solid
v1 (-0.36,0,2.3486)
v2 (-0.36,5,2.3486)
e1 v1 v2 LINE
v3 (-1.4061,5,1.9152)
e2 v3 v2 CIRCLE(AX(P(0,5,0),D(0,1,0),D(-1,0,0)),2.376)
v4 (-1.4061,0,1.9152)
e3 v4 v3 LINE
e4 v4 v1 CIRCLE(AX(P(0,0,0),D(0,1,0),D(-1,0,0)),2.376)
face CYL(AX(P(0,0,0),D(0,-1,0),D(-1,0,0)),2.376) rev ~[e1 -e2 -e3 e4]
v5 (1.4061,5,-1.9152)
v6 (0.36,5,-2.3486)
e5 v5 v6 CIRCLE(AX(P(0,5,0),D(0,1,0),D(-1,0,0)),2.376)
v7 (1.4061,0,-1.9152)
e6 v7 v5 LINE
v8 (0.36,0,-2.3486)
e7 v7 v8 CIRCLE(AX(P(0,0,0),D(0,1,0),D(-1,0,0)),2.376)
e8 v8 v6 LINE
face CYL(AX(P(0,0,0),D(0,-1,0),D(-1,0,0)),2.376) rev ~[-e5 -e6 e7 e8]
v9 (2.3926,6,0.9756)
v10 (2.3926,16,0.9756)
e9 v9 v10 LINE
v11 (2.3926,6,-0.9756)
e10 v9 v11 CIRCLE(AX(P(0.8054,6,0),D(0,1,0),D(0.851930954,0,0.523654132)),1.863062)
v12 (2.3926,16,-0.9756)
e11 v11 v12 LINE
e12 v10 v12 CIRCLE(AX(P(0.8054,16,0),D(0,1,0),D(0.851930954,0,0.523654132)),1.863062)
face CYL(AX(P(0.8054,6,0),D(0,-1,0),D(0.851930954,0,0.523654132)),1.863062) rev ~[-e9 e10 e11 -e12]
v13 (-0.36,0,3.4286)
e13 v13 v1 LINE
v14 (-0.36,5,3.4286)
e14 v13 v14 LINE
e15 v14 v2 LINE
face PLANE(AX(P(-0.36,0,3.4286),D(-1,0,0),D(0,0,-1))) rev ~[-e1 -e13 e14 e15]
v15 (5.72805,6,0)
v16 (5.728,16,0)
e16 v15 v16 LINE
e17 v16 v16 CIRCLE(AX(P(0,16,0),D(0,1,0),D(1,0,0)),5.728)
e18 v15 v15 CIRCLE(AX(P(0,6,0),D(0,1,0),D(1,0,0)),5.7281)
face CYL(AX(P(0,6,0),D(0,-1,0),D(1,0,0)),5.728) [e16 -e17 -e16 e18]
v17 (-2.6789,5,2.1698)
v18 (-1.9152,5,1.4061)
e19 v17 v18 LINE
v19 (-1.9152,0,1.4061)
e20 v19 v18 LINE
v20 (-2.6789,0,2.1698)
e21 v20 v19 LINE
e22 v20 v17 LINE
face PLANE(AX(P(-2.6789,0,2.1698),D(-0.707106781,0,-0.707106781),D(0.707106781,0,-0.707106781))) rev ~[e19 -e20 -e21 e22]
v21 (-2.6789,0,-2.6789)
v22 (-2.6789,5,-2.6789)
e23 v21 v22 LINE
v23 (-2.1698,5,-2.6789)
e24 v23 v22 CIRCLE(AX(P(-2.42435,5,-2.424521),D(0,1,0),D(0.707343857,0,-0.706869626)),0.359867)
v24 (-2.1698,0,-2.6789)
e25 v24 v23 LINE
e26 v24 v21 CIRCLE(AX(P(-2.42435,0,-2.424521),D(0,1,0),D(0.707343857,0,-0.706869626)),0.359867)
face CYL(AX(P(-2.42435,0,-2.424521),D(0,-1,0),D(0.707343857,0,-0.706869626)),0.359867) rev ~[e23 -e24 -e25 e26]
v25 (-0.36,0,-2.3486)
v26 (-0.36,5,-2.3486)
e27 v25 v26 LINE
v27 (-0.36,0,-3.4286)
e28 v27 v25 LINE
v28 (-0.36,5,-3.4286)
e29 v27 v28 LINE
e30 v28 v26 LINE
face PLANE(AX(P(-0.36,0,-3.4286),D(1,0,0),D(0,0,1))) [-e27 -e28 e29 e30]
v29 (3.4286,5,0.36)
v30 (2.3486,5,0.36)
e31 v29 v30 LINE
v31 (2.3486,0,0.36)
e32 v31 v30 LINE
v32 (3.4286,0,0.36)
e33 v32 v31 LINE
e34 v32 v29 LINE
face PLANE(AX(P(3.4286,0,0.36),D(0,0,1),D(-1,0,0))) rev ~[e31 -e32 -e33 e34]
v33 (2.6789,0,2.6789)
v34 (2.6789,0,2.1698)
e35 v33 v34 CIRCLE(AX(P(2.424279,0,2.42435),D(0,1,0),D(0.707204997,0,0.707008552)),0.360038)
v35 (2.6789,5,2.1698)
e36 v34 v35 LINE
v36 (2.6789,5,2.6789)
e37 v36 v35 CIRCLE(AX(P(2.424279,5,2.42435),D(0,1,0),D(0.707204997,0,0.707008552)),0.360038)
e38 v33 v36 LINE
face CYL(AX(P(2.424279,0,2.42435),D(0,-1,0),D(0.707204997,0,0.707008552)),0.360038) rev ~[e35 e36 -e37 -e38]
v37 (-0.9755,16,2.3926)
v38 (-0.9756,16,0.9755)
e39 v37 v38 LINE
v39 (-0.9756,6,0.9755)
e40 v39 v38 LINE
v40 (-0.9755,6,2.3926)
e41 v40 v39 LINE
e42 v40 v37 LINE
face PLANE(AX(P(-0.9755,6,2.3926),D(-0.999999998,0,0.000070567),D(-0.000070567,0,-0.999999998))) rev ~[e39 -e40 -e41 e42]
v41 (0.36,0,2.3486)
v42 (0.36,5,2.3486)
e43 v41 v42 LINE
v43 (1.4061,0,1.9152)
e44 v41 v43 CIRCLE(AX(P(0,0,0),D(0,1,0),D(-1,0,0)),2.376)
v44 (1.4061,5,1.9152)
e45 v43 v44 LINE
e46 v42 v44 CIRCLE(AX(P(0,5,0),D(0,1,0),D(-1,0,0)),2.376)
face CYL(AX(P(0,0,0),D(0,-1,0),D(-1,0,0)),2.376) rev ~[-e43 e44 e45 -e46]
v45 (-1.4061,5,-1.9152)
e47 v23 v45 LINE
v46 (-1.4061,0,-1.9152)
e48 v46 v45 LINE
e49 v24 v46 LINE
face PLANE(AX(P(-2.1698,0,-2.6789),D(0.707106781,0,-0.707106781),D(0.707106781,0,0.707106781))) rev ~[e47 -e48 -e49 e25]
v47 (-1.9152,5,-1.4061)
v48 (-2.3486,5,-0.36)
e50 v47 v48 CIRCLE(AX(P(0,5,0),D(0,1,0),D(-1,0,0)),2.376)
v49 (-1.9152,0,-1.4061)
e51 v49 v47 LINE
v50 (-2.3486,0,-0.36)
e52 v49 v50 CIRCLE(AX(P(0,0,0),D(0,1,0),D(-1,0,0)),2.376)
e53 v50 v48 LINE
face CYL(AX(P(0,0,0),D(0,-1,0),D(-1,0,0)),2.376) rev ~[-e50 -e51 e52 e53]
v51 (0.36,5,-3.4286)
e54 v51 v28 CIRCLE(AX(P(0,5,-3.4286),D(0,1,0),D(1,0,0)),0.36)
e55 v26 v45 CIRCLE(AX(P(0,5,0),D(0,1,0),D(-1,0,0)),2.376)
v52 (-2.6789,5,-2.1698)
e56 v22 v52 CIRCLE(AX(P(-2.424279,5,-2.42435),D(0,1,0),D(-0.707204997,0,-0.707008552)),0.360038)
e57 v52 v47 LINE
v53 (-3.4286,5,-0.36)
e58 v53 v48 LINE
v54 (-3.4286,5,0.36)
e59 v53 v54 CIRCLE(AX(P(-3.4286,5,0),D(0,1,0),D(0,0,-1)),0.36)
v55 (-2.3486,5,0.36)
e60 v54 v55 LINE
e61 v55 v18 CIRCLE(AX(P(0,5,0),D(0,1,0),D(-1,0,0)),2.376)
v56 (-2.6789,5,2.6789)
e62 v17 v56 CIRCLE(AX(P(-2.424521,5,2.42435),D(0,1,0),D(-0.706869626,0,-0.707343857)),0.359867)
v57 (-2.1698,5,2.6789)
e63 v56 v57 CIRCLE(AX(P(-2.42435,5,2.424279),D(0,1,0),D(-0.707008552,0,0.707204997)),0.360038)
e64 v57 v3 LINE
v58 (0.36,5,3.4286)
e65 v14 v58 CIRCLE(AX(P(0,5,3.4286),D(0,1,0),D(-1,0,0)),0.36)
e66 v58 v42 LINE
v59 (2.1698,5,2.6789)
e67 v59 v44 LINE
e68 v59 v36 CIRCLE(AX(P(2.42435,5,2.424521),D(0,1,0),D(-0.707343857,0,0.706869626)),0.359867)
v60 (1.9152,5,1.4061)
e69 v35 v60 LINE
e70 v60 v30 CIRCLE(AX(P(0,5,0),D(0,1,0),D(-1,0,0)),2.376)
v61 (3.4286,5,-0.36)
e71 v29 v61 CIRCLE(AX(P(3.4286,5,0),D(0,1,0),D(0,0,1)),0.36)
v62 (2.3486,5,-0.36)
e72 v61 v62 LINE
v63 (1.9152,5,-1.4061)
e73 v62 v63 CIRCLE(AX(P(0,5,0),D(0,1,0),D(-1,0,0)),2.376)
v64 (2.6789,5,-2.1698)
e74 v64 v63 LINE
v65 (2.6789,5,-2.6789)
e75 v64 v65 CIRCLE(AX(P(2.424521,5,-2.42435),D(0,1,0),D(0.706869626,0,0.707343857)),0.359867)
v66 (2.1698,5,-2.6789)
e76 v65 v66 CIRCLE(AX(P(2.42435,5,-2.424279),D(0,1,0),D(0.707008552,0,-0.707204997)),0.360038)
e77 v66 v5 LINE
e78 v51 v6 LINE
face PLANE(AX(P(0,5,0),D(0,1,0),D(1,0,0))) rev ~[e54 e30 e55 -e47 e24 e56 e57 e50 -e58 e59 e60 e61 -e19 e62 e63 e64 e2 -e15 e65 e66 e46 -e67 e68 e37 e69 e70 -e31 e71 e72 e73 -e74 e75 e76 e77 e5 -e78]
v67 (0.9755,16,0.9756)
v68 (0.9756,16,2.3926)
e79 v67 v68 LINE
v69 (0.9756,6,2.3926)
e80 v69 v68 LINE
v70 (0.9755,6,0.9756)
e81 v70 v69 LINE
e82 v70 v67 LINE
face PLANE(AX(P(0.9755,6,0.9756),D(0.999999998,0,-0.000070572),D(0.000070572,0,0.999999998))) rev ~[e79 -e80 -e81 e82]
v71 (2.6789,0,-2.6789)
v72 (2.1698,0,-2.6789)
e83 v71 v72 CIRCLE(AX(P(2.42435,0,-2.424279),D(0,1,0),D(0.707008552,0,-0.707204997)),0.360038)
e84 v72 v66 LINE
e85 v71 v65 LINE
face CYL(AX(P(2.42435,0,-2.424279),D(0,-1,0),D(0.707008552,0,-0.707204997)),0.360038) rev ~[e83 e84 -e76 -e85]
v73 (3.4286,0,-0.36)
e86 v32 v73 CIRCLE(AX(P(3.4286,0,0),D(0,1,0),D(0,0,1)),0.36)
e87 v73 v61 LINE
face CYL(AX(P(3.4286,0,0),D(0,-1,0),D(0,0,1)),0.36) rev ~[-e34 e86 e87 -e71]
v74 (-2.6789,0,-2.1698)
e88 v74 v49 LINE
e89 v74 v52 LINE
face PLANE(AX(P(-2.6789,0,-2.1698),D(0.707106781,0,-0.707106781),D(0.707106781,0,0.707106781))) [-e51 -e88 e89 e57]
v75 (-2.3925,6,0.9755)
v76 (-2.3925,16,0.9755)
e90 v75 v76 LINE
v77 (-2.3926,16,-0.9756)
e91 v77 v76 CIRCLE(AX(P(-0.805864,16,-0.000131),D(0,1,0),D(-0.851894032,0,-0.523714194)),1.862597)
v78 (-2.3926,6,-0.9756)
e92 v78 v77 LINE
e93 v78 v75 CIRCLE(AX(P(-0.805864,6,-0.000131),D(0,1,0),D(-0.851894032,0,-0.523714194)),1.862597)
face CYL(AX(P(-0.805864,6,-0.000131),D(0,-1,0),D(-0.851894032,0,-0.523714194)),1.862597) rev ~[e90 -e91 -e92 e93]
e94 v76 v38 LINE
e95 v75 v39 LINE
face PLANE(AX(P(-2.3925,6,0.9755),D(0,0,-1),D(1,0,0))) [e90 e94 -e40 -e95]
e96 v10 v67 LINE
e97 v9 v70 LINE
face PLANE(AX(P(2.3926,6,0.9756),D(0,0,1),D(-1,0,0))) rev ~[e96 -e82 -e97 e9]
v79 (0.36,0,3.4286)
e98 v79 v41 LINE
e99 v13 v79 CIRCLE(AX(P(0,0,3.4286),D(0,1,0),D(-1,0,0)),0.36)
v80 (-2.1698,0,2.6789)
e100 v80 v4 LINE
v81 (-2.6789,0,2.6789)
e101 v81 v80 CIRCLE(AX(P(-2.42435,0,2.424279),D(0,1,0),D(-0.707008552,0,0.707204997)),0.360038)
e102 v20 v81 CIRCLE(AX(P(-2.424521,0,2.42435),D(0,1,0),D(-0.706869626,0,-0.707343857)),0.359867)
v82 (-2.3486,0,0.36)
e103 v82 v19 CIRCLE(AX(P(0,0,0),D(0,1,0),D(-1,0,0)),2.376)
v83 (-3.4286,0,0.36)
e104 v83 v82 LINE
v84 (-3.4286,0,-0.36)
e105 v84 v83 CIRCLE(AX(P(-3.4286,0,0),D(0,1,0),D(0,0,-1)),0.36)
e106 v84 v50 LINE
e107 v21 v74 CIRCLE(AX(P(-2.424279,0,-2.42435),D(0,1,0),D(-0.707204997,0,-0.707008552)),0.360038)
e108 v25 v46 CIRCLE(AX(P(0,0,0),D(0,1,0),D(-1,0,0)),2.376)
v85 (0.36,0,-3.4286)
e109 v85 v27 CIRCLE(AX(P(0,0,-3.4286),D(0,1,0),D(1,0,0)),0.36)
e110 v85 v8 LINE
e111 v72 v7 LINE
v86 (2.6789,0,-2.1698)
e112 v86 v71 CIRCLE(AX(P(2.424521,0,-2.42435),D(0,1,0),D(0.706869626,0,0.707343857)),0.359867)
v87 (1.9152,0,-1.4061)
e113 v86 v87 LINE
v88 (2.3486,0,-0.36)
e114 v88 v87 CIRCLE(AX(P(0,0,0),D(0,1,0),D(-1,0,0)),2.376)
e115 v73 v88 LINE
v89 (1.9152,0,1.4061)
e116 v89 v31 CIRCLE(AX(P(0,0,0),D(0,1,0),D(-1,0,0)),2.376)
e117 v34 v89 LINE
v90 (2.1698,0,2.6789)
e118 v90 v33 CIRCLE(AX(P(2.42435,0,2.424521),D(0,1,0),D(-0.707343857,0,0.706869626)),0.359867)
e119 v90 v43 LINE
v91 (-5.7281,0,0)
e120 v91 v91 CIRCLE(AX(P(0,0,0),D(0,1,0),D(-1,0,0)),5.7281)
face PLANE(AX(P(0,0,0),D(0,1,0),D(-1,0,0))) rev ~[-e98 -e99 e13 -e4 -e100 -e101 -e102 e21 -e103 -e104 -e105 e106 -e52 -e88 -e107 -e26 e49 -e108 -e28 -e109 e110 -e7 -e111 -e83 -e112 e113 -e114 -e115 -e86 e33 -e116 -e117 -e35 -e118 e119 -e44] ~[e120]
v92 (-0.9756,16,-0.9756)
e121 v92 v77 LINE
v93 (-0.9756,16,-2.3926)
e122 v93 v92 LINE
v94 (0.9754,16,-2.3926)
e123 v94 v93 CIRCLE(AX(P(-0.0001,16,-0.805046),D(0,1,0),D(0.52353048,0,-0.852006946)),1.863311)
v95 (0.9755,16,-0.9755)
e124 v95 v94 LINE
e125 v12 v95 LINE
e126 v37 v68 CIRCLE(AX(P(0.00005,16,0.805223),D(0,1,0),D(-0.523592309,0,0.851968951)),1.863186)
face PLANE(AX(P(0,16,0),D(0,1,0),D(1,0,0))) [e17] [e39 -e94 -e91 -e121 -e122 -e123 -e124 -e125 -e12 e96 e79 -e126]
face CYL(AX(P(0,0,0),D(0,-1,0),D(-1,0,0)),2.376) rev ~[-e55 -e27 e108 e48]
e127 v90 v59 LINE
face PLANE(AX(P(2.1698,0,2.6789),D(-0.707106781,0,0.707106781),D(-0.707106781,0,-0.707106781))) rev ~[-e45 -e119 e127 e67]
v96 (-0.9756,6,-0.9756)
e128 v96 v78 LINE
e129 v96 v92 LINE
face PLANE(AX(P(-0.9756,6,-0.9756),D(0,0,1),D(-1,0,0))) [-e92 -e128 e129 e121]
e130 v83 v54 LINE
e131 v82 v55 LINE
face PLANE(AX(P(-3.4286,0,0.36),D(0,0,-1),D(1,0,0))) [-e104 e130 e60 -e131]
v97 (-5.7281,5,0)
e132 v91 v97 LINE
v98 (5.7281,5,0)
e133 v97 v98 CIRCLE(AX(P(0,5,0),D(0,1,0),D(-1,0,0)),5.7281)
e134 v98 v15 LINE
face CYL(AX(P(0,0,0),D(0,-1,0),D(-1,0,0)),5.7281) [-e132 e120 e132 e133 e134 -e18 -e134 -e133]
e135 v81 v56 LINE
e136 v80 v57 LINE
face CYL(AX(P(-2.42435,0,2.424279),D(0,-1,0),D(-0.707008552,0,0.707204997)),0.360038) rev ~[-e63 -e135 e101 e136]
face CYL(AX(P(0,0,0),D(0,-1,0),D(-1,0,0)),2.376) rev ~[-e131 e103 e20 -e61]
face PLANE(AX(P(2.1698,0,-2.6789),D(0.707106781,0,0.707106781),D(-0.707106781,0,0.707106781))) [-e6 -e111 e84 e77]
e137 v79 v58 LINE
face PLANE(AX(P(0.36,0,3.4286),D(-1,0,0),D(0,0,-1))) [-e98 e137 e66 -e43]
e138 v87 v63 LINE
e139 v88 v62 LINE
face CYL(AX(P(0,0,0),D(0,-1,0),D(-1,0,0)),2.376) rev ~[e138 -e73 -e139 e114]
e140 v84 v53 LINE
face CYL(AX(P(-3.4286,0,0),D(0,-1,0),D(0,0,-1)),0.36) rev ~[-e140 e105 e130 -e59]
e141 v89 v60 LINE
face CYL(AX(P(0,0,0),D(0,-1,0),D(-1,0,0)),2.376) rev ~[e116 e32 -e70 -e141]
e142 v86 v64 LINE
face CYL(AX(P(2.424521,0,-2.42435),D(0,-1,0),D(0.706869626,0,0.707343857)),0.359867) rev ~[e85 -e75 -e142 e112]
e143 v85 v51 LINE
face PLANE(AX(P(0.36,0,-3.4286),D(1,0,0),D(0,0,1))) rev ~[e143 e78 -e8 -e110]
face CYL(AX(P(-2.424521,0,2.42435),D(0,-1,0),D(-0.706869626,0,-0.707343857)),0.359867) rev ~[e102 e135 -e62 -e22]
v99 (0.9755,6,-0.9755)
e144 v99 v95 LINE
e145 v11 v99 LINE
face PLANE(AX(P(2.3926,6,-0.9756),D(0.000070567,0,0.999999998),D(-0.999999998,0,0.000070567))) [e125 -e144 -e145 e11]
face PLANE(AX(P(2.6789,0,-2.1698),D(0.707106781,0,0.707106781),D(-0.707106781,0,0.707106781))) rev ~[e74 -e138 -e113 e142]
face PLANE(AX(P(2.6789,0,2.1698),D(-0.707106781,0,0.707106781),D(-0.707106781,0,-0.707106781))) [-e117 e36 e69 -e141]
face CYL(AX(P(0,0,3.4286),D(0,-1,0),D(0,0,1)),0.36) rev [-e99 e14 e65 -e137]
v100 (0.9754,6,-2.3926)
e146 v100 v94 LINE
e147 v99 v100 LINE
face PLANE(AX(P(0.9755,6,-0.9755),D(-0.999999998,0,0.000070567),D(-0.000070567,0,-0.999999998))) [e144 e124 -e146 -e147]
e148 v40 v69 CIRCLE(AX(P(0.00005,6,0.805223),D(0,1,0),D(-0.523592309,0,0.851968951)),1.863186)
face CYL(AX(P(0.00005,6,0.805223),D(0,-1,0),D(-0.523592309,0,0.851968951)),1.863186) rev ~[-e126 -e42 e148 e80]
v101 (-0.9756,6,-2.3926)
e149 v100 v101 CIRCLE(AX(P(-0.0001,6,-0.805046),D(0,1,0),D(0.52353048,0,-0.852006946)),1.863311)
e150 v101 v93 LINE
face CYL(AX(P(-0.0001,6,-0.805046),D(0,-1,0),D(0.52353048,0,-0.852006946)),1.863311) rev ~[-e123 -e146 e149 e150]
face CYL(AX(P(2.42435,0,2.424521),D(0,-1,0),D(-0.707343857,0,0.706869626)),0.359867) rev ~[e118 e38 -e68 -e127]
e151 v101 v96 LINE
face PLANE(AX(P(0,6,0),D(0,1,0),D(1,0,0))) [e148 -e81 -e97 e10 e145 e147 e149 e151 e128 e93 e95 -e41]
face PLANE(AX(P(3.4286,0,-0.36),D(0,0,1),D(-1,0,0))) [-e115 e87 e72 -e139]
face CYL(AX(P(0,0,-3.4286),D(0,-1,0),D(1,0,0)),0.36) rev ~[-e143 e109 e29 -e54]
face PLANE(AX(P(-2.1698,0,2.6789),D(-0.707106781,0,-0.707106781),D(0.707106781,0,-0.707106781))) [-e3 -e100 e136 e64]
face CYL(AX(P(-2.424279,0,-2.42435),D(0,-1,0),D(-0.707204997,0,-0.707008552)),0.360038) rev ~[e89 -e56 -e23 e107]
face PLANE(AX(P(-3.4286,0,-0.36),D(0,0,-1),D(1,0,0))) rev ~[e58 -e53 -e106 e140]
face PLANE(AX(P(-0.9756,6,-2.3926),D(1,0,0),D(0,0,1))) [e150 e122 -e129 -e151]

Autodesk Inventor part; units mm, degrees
ref_plane "YZ Plane" through (0, 0, 0) normal (1, 0, 0) x (0, 1, 0)
ref_plane "XZ Plane" through (0, 0, 0) normal (0, 1, 0) x (-1, 0, 0)
ref_plane "XY Plane" through (0, 0, 0) normal (0, 0, 1) x (1, 0, 0)
sketch "Sketch1" plane through (0, 0, 0) normal (0, 1, 0) x (-1, 0, 0)
  arc A0 (0, 3.7886) -> (-0.36, 3.4286) centre (0, 3.4286) ccw
  arc A1 (0.36, 3.4286) -> (0, 3.7886) centre (0, 3.4286) ccw
  line L0 (0, 3.7886) -> (0, 3.7886)
  line L1 (-2.6789, 2.1698) -> (-1.9152, 1.4061)
  arc A2 (-2.1698, 2.6789) -> (-2.6789, 2.6789) centre (-2.4244, 2.4244) ccw
  line L2 (-2.6789, 2.6789) -> (-2.6789, 2.6789)
  arc A3 (-2.6789, 2.6789) -> (-2.6789, 2.1698) centre (-2.4244, 2.4244) ccw
  line L3 (-3.4286, 0.36) -> (-2.3486, 0.36)
  arc A4 (-2.3486, 0.36) -> (-2.3486, -0.36) centre (0, 0) ccw
  line L4 (-3.4286, -0.36) -> (-2.3486, -0.36)
  arc A5 (-3.4286, 0.36) -> (-3.7886, 0) centre (-3.4286, 0) ccw
  line L5 (-3.7886, 0) -> (-3.7886, 0)
  arc A6 (-3.7886, 0) -> (-3.4286, -0.36) centre (-3.4286, 0) ccw
  line L6 (-2.6789, -2.1698) -> (-1.9152, -1.4061)
  arc A7 (-2.6789, -2.1698) -> (-2.6789, -2.6789) centre (-2.4244, -2.4244) ccw
  line L7 (-2.6789, -2.6789) -> (-2.6789, -2.6789)
  arc A8 (-2.6789, -2.6789) -> (-2.1698, -2.6789) centre (-2.4244, -2.4244) ccw
  line L8 (-2.1698, -2.6789) -> (-1.4061, -1.9152)
  arc A9 (-1.9152, -1.4061) -> (-1.4061, -1.9152) centre (0, 0) ccw
  line L9 (-0.36, -3.4286) -> (-0.36, -2.3486)
  arc A10 (-0.36, -2.3486) -> (0.36, -2.3486) centre (0, 0) ccw
  arc A11 (-0.36, -3.4286) -> (0, -3.7886) centre (0, -3.4286) ccw
  line L10 (0, -3.7886) -> (0, -3.7886)
  arc A12 (0, -3.7886) -> (0.36, -3.4286) centre (0, -3.4286) ccw
  line L11 (0.36, -3.4286) -> (0.36, -2.3486)
  line L12 (2.1698, -2.6789) -> (1.4061, -1.9152)
  arc A13 (1.4061, -1.9152) -> (1.9152, -1.4061) centre (0, 0) ccw
  arc A14 (2.1698, -2.6789) -> (2.6789, -2.6789) centre (2.4244, -2.4244) ccw
  line L13 (2.6789, -2.6789) -> (2.6789, -2.6789)
  arc A15 (2.6789, -2.6789) -> (2.6789, -2.1698) centre (2.4244, -2.4244) ccw
  line L14 (2.6789, -2.1698) -> (1.9152, -1.4061)
  line L15 (3.4286, -0.36) -> (2.3486, -0.36)
  arc A16 (2.3486, -0.36) -> (2.3486, 0.36) centre (0, 0) ccw
  line L16 (3.4286, 0.36) -> (2.3486, 0.36)
  arc A17 (3.4286, -0.36) -> (3.7886, 0) centre (3.4286, 0) ccw
  line L17 (3.7886, 0) -> (3.7886, 0)
  arc A18 (3.7886, 0) -> (3.4286, 0.36) centre (3.4286, 0) ccw
  line L18 (2.6789, 2.1698) -> (1.9152, 1.4061)
  arc A19 (1.9152, 1.4061) -> (1.4061, 1.9152) centre (0, 0) ccw
  arc A20 (2.6789, 2.1698) -> (2.6789, 2.6789) centre (2.4244, 2.4244) ccw
  line L19 (2.6789, 2.6789) -> (2.6789, 2.6789)
  arc A21 (2.6789, 2.6789) -> (2.1698, 2.6789) centre (2.4244, 2.4244) ccw
  line L20 (2.1698, 2.6789) -> (1.4061, 1.9152)
  line L21 (0.36, 3.4286) -> (0.36, 2.3486)
  arc A22 (0.36, 2.3486) -> (-0.36, 2.3486) centre (0, 0) ccw
  line L22 (-2.1698, 2.6789) -> (-1.4061, 1.9152)
  arc A23 (-1.4061, 1.9152) -> (-1.9152, 1.4061) centre (0, 0) ccw
  circle A24 centre (0, 0) radius 2.376
  line L23 (-0.36, 3.4286) -> (-0.36, 2.3486)
  circle A25 centre (0, 0) radius 5.7281
  point P0 (-0.36, 3.7886)
  point P1 (0.36, 3.7886)
  point P2 (-2.0323, 2.0323)
  point P3 (-2.9335, 2.4244)
  point P4 (-2.4244, 2.9335)
  point P5 (-3.7886, 0.36)
  point P6 (-2.8742, 0)
  point P7 (-3.7886, -0.36)
  point P8 (-2.9335, -2.4244)
  point P9 (-2.0323, -2.0323)
  point P10 (-2.4244, -2.9335)
  point P11 (-0.36, -3.7886)
  point P12 (0, -2.8742)
  point P13 (0.36, -3.7886)
  point P14 (2.4244, -2.9335)
  point P15 (2.0323, -2.0323)
  point P16 (2.9335, -2.4244)
  point P17 (3.7886, -0.36)
  point P18 (2.8742, 0)
  point P19 (3.7886, 0.36)
  point P20 (2.9335, 2.4244)
  point P21 (2.4244, 2.9335)
  point P22 (2.0323, 2.0323)
  point P23 (0, 2.8742)
  point P24 (-1.4061, 1.9152)
  point P25 (0, 3.7886)
  point P26 (1.4061, 1.9152)
  point P27 (1.9152, 1.4061)
  point P28 (2.3486, 0.36)
  point P29 (3.7886, 0)
  point P30 (2.3486, -0.36)
  point P31 (2.6789, -2.6789)
  point P32 (1.4061, -1.9152)
  point P33 (0.36, -2.3486)
  point P34 (0, -3.7886)
  point P35 (-0.36, -2.3486)
  point P36 (-1.4061, -1.9152)
  point P37 (-2.6789, -2.6789)
  point P38 (-1.9152, -1.4061)
  point P39 (-2.3486, -0.36)
  point P40 (-3.7886, 0)
  point P41 (-1.9152, 1.4061)
  dimension "d2" = 4.752
  dimension "d3" = 0.72
  dimension "d4" = 1.44
  dimension "d5" = 1.44
  dimension "d6" = 0.36
  dimension "d7" = 360
  dimension "d38" = 0
  dimension "d39" = 0
extrude "Extrusion1" add sketch "Sketch1" along normal blind 5
sketch "Sketch2" plane through (0, 5, 0) normal (0, 1, 0) x (1, 0, 0)
  circle A0 centre (0, 0) radius 5.7281
  point P0 (0, 0)
extrude "Extrusion2" add sketch "Sketch2" along normal blind 1
sketch "Sketch7" plane through (0, 6, 0) normal (0, 1, 0) x (1, 0, 0)
  line L0 (2.3926, -0.9756) -> (2.3926, 0.9756)
  line L1 (2.3926, 0.9756) -> (0.9755, 0.9755)
  line L2 (0.9755, 0.9755) -> (0.9754, 2.3926)
  line L3 (0.9754, 2.3926) -> (-0.9756, 2.3926)
  arc A0 (0.9754, 2.3926) -> (-0.9756, 2.3926) centre (0, 0.8054) ccw
  arc A1 (2.3926, -0.9756) -> (2.3926, 0.9756) centre (0.8054, 0) ccw
  line L4 (2.3926, -0.9756) -> (0.9755, -0.9756)
  line L5 (0.9755, -0.9756) -> (0.9756, -2.3926)
  line L6 (0.9756, -2.3926) -> (-0.9755, -2.3926)
  arc A2 (-0.9755, -2.3926) -> (0.9756, -2.3926) centre (0, -0.8054) ccw
  line L7 (-0.9756, 2.3926) -> (-0.9756, 0.9756)
  line L8 (-0.9755, -2.3926) -> (-0.9756, -0.9755)
  line L9 (-0.9756, 0.9756) -> (-2.3926, 0.9756)
  line L10 (-2.3926, 0.9756) -> (-2.3925, -0.9755)
  line L11 (-2.3925, -0.9755) -> (-0.9756, -0.9755)
  arc A3 (-2.3926, 0.9756) -> (-2.3925, -0.9755) centre (-0.8054, 0) ccw
  circle A4 centre (0, 0) radius 5.728
  dimension "d29" = 1.951
  dimension "d32" = 1.9511
  dimension "d34" = 0.9756
  dimension "d31" = 1.4171
  dimension "d30" = 1.417
  dimension "d33" = 2.5838
  dimension "d28" = 1.863
  dimension "d27" = 1.863
  dimension "d25" = 1.417
  dimension "d24" = 1.9511
  dimension "d23" = 1.863
  dimension "d26" = 1.417
  dimension "d21" = 2.5838
  dimension "d20" = 1.9511
  dimension "d19" = 1.863
  dimension "d18" = 2.3925
  dimension "d17" = 2.3925
  dimension "d22" = 1.417
  dimension "d16" = 1.417
  dimension "d15" = 11.456
extrude "Extrusion4" add sketch "Sketch7" along normal blind 10
properties part number "Servo_stycke"
